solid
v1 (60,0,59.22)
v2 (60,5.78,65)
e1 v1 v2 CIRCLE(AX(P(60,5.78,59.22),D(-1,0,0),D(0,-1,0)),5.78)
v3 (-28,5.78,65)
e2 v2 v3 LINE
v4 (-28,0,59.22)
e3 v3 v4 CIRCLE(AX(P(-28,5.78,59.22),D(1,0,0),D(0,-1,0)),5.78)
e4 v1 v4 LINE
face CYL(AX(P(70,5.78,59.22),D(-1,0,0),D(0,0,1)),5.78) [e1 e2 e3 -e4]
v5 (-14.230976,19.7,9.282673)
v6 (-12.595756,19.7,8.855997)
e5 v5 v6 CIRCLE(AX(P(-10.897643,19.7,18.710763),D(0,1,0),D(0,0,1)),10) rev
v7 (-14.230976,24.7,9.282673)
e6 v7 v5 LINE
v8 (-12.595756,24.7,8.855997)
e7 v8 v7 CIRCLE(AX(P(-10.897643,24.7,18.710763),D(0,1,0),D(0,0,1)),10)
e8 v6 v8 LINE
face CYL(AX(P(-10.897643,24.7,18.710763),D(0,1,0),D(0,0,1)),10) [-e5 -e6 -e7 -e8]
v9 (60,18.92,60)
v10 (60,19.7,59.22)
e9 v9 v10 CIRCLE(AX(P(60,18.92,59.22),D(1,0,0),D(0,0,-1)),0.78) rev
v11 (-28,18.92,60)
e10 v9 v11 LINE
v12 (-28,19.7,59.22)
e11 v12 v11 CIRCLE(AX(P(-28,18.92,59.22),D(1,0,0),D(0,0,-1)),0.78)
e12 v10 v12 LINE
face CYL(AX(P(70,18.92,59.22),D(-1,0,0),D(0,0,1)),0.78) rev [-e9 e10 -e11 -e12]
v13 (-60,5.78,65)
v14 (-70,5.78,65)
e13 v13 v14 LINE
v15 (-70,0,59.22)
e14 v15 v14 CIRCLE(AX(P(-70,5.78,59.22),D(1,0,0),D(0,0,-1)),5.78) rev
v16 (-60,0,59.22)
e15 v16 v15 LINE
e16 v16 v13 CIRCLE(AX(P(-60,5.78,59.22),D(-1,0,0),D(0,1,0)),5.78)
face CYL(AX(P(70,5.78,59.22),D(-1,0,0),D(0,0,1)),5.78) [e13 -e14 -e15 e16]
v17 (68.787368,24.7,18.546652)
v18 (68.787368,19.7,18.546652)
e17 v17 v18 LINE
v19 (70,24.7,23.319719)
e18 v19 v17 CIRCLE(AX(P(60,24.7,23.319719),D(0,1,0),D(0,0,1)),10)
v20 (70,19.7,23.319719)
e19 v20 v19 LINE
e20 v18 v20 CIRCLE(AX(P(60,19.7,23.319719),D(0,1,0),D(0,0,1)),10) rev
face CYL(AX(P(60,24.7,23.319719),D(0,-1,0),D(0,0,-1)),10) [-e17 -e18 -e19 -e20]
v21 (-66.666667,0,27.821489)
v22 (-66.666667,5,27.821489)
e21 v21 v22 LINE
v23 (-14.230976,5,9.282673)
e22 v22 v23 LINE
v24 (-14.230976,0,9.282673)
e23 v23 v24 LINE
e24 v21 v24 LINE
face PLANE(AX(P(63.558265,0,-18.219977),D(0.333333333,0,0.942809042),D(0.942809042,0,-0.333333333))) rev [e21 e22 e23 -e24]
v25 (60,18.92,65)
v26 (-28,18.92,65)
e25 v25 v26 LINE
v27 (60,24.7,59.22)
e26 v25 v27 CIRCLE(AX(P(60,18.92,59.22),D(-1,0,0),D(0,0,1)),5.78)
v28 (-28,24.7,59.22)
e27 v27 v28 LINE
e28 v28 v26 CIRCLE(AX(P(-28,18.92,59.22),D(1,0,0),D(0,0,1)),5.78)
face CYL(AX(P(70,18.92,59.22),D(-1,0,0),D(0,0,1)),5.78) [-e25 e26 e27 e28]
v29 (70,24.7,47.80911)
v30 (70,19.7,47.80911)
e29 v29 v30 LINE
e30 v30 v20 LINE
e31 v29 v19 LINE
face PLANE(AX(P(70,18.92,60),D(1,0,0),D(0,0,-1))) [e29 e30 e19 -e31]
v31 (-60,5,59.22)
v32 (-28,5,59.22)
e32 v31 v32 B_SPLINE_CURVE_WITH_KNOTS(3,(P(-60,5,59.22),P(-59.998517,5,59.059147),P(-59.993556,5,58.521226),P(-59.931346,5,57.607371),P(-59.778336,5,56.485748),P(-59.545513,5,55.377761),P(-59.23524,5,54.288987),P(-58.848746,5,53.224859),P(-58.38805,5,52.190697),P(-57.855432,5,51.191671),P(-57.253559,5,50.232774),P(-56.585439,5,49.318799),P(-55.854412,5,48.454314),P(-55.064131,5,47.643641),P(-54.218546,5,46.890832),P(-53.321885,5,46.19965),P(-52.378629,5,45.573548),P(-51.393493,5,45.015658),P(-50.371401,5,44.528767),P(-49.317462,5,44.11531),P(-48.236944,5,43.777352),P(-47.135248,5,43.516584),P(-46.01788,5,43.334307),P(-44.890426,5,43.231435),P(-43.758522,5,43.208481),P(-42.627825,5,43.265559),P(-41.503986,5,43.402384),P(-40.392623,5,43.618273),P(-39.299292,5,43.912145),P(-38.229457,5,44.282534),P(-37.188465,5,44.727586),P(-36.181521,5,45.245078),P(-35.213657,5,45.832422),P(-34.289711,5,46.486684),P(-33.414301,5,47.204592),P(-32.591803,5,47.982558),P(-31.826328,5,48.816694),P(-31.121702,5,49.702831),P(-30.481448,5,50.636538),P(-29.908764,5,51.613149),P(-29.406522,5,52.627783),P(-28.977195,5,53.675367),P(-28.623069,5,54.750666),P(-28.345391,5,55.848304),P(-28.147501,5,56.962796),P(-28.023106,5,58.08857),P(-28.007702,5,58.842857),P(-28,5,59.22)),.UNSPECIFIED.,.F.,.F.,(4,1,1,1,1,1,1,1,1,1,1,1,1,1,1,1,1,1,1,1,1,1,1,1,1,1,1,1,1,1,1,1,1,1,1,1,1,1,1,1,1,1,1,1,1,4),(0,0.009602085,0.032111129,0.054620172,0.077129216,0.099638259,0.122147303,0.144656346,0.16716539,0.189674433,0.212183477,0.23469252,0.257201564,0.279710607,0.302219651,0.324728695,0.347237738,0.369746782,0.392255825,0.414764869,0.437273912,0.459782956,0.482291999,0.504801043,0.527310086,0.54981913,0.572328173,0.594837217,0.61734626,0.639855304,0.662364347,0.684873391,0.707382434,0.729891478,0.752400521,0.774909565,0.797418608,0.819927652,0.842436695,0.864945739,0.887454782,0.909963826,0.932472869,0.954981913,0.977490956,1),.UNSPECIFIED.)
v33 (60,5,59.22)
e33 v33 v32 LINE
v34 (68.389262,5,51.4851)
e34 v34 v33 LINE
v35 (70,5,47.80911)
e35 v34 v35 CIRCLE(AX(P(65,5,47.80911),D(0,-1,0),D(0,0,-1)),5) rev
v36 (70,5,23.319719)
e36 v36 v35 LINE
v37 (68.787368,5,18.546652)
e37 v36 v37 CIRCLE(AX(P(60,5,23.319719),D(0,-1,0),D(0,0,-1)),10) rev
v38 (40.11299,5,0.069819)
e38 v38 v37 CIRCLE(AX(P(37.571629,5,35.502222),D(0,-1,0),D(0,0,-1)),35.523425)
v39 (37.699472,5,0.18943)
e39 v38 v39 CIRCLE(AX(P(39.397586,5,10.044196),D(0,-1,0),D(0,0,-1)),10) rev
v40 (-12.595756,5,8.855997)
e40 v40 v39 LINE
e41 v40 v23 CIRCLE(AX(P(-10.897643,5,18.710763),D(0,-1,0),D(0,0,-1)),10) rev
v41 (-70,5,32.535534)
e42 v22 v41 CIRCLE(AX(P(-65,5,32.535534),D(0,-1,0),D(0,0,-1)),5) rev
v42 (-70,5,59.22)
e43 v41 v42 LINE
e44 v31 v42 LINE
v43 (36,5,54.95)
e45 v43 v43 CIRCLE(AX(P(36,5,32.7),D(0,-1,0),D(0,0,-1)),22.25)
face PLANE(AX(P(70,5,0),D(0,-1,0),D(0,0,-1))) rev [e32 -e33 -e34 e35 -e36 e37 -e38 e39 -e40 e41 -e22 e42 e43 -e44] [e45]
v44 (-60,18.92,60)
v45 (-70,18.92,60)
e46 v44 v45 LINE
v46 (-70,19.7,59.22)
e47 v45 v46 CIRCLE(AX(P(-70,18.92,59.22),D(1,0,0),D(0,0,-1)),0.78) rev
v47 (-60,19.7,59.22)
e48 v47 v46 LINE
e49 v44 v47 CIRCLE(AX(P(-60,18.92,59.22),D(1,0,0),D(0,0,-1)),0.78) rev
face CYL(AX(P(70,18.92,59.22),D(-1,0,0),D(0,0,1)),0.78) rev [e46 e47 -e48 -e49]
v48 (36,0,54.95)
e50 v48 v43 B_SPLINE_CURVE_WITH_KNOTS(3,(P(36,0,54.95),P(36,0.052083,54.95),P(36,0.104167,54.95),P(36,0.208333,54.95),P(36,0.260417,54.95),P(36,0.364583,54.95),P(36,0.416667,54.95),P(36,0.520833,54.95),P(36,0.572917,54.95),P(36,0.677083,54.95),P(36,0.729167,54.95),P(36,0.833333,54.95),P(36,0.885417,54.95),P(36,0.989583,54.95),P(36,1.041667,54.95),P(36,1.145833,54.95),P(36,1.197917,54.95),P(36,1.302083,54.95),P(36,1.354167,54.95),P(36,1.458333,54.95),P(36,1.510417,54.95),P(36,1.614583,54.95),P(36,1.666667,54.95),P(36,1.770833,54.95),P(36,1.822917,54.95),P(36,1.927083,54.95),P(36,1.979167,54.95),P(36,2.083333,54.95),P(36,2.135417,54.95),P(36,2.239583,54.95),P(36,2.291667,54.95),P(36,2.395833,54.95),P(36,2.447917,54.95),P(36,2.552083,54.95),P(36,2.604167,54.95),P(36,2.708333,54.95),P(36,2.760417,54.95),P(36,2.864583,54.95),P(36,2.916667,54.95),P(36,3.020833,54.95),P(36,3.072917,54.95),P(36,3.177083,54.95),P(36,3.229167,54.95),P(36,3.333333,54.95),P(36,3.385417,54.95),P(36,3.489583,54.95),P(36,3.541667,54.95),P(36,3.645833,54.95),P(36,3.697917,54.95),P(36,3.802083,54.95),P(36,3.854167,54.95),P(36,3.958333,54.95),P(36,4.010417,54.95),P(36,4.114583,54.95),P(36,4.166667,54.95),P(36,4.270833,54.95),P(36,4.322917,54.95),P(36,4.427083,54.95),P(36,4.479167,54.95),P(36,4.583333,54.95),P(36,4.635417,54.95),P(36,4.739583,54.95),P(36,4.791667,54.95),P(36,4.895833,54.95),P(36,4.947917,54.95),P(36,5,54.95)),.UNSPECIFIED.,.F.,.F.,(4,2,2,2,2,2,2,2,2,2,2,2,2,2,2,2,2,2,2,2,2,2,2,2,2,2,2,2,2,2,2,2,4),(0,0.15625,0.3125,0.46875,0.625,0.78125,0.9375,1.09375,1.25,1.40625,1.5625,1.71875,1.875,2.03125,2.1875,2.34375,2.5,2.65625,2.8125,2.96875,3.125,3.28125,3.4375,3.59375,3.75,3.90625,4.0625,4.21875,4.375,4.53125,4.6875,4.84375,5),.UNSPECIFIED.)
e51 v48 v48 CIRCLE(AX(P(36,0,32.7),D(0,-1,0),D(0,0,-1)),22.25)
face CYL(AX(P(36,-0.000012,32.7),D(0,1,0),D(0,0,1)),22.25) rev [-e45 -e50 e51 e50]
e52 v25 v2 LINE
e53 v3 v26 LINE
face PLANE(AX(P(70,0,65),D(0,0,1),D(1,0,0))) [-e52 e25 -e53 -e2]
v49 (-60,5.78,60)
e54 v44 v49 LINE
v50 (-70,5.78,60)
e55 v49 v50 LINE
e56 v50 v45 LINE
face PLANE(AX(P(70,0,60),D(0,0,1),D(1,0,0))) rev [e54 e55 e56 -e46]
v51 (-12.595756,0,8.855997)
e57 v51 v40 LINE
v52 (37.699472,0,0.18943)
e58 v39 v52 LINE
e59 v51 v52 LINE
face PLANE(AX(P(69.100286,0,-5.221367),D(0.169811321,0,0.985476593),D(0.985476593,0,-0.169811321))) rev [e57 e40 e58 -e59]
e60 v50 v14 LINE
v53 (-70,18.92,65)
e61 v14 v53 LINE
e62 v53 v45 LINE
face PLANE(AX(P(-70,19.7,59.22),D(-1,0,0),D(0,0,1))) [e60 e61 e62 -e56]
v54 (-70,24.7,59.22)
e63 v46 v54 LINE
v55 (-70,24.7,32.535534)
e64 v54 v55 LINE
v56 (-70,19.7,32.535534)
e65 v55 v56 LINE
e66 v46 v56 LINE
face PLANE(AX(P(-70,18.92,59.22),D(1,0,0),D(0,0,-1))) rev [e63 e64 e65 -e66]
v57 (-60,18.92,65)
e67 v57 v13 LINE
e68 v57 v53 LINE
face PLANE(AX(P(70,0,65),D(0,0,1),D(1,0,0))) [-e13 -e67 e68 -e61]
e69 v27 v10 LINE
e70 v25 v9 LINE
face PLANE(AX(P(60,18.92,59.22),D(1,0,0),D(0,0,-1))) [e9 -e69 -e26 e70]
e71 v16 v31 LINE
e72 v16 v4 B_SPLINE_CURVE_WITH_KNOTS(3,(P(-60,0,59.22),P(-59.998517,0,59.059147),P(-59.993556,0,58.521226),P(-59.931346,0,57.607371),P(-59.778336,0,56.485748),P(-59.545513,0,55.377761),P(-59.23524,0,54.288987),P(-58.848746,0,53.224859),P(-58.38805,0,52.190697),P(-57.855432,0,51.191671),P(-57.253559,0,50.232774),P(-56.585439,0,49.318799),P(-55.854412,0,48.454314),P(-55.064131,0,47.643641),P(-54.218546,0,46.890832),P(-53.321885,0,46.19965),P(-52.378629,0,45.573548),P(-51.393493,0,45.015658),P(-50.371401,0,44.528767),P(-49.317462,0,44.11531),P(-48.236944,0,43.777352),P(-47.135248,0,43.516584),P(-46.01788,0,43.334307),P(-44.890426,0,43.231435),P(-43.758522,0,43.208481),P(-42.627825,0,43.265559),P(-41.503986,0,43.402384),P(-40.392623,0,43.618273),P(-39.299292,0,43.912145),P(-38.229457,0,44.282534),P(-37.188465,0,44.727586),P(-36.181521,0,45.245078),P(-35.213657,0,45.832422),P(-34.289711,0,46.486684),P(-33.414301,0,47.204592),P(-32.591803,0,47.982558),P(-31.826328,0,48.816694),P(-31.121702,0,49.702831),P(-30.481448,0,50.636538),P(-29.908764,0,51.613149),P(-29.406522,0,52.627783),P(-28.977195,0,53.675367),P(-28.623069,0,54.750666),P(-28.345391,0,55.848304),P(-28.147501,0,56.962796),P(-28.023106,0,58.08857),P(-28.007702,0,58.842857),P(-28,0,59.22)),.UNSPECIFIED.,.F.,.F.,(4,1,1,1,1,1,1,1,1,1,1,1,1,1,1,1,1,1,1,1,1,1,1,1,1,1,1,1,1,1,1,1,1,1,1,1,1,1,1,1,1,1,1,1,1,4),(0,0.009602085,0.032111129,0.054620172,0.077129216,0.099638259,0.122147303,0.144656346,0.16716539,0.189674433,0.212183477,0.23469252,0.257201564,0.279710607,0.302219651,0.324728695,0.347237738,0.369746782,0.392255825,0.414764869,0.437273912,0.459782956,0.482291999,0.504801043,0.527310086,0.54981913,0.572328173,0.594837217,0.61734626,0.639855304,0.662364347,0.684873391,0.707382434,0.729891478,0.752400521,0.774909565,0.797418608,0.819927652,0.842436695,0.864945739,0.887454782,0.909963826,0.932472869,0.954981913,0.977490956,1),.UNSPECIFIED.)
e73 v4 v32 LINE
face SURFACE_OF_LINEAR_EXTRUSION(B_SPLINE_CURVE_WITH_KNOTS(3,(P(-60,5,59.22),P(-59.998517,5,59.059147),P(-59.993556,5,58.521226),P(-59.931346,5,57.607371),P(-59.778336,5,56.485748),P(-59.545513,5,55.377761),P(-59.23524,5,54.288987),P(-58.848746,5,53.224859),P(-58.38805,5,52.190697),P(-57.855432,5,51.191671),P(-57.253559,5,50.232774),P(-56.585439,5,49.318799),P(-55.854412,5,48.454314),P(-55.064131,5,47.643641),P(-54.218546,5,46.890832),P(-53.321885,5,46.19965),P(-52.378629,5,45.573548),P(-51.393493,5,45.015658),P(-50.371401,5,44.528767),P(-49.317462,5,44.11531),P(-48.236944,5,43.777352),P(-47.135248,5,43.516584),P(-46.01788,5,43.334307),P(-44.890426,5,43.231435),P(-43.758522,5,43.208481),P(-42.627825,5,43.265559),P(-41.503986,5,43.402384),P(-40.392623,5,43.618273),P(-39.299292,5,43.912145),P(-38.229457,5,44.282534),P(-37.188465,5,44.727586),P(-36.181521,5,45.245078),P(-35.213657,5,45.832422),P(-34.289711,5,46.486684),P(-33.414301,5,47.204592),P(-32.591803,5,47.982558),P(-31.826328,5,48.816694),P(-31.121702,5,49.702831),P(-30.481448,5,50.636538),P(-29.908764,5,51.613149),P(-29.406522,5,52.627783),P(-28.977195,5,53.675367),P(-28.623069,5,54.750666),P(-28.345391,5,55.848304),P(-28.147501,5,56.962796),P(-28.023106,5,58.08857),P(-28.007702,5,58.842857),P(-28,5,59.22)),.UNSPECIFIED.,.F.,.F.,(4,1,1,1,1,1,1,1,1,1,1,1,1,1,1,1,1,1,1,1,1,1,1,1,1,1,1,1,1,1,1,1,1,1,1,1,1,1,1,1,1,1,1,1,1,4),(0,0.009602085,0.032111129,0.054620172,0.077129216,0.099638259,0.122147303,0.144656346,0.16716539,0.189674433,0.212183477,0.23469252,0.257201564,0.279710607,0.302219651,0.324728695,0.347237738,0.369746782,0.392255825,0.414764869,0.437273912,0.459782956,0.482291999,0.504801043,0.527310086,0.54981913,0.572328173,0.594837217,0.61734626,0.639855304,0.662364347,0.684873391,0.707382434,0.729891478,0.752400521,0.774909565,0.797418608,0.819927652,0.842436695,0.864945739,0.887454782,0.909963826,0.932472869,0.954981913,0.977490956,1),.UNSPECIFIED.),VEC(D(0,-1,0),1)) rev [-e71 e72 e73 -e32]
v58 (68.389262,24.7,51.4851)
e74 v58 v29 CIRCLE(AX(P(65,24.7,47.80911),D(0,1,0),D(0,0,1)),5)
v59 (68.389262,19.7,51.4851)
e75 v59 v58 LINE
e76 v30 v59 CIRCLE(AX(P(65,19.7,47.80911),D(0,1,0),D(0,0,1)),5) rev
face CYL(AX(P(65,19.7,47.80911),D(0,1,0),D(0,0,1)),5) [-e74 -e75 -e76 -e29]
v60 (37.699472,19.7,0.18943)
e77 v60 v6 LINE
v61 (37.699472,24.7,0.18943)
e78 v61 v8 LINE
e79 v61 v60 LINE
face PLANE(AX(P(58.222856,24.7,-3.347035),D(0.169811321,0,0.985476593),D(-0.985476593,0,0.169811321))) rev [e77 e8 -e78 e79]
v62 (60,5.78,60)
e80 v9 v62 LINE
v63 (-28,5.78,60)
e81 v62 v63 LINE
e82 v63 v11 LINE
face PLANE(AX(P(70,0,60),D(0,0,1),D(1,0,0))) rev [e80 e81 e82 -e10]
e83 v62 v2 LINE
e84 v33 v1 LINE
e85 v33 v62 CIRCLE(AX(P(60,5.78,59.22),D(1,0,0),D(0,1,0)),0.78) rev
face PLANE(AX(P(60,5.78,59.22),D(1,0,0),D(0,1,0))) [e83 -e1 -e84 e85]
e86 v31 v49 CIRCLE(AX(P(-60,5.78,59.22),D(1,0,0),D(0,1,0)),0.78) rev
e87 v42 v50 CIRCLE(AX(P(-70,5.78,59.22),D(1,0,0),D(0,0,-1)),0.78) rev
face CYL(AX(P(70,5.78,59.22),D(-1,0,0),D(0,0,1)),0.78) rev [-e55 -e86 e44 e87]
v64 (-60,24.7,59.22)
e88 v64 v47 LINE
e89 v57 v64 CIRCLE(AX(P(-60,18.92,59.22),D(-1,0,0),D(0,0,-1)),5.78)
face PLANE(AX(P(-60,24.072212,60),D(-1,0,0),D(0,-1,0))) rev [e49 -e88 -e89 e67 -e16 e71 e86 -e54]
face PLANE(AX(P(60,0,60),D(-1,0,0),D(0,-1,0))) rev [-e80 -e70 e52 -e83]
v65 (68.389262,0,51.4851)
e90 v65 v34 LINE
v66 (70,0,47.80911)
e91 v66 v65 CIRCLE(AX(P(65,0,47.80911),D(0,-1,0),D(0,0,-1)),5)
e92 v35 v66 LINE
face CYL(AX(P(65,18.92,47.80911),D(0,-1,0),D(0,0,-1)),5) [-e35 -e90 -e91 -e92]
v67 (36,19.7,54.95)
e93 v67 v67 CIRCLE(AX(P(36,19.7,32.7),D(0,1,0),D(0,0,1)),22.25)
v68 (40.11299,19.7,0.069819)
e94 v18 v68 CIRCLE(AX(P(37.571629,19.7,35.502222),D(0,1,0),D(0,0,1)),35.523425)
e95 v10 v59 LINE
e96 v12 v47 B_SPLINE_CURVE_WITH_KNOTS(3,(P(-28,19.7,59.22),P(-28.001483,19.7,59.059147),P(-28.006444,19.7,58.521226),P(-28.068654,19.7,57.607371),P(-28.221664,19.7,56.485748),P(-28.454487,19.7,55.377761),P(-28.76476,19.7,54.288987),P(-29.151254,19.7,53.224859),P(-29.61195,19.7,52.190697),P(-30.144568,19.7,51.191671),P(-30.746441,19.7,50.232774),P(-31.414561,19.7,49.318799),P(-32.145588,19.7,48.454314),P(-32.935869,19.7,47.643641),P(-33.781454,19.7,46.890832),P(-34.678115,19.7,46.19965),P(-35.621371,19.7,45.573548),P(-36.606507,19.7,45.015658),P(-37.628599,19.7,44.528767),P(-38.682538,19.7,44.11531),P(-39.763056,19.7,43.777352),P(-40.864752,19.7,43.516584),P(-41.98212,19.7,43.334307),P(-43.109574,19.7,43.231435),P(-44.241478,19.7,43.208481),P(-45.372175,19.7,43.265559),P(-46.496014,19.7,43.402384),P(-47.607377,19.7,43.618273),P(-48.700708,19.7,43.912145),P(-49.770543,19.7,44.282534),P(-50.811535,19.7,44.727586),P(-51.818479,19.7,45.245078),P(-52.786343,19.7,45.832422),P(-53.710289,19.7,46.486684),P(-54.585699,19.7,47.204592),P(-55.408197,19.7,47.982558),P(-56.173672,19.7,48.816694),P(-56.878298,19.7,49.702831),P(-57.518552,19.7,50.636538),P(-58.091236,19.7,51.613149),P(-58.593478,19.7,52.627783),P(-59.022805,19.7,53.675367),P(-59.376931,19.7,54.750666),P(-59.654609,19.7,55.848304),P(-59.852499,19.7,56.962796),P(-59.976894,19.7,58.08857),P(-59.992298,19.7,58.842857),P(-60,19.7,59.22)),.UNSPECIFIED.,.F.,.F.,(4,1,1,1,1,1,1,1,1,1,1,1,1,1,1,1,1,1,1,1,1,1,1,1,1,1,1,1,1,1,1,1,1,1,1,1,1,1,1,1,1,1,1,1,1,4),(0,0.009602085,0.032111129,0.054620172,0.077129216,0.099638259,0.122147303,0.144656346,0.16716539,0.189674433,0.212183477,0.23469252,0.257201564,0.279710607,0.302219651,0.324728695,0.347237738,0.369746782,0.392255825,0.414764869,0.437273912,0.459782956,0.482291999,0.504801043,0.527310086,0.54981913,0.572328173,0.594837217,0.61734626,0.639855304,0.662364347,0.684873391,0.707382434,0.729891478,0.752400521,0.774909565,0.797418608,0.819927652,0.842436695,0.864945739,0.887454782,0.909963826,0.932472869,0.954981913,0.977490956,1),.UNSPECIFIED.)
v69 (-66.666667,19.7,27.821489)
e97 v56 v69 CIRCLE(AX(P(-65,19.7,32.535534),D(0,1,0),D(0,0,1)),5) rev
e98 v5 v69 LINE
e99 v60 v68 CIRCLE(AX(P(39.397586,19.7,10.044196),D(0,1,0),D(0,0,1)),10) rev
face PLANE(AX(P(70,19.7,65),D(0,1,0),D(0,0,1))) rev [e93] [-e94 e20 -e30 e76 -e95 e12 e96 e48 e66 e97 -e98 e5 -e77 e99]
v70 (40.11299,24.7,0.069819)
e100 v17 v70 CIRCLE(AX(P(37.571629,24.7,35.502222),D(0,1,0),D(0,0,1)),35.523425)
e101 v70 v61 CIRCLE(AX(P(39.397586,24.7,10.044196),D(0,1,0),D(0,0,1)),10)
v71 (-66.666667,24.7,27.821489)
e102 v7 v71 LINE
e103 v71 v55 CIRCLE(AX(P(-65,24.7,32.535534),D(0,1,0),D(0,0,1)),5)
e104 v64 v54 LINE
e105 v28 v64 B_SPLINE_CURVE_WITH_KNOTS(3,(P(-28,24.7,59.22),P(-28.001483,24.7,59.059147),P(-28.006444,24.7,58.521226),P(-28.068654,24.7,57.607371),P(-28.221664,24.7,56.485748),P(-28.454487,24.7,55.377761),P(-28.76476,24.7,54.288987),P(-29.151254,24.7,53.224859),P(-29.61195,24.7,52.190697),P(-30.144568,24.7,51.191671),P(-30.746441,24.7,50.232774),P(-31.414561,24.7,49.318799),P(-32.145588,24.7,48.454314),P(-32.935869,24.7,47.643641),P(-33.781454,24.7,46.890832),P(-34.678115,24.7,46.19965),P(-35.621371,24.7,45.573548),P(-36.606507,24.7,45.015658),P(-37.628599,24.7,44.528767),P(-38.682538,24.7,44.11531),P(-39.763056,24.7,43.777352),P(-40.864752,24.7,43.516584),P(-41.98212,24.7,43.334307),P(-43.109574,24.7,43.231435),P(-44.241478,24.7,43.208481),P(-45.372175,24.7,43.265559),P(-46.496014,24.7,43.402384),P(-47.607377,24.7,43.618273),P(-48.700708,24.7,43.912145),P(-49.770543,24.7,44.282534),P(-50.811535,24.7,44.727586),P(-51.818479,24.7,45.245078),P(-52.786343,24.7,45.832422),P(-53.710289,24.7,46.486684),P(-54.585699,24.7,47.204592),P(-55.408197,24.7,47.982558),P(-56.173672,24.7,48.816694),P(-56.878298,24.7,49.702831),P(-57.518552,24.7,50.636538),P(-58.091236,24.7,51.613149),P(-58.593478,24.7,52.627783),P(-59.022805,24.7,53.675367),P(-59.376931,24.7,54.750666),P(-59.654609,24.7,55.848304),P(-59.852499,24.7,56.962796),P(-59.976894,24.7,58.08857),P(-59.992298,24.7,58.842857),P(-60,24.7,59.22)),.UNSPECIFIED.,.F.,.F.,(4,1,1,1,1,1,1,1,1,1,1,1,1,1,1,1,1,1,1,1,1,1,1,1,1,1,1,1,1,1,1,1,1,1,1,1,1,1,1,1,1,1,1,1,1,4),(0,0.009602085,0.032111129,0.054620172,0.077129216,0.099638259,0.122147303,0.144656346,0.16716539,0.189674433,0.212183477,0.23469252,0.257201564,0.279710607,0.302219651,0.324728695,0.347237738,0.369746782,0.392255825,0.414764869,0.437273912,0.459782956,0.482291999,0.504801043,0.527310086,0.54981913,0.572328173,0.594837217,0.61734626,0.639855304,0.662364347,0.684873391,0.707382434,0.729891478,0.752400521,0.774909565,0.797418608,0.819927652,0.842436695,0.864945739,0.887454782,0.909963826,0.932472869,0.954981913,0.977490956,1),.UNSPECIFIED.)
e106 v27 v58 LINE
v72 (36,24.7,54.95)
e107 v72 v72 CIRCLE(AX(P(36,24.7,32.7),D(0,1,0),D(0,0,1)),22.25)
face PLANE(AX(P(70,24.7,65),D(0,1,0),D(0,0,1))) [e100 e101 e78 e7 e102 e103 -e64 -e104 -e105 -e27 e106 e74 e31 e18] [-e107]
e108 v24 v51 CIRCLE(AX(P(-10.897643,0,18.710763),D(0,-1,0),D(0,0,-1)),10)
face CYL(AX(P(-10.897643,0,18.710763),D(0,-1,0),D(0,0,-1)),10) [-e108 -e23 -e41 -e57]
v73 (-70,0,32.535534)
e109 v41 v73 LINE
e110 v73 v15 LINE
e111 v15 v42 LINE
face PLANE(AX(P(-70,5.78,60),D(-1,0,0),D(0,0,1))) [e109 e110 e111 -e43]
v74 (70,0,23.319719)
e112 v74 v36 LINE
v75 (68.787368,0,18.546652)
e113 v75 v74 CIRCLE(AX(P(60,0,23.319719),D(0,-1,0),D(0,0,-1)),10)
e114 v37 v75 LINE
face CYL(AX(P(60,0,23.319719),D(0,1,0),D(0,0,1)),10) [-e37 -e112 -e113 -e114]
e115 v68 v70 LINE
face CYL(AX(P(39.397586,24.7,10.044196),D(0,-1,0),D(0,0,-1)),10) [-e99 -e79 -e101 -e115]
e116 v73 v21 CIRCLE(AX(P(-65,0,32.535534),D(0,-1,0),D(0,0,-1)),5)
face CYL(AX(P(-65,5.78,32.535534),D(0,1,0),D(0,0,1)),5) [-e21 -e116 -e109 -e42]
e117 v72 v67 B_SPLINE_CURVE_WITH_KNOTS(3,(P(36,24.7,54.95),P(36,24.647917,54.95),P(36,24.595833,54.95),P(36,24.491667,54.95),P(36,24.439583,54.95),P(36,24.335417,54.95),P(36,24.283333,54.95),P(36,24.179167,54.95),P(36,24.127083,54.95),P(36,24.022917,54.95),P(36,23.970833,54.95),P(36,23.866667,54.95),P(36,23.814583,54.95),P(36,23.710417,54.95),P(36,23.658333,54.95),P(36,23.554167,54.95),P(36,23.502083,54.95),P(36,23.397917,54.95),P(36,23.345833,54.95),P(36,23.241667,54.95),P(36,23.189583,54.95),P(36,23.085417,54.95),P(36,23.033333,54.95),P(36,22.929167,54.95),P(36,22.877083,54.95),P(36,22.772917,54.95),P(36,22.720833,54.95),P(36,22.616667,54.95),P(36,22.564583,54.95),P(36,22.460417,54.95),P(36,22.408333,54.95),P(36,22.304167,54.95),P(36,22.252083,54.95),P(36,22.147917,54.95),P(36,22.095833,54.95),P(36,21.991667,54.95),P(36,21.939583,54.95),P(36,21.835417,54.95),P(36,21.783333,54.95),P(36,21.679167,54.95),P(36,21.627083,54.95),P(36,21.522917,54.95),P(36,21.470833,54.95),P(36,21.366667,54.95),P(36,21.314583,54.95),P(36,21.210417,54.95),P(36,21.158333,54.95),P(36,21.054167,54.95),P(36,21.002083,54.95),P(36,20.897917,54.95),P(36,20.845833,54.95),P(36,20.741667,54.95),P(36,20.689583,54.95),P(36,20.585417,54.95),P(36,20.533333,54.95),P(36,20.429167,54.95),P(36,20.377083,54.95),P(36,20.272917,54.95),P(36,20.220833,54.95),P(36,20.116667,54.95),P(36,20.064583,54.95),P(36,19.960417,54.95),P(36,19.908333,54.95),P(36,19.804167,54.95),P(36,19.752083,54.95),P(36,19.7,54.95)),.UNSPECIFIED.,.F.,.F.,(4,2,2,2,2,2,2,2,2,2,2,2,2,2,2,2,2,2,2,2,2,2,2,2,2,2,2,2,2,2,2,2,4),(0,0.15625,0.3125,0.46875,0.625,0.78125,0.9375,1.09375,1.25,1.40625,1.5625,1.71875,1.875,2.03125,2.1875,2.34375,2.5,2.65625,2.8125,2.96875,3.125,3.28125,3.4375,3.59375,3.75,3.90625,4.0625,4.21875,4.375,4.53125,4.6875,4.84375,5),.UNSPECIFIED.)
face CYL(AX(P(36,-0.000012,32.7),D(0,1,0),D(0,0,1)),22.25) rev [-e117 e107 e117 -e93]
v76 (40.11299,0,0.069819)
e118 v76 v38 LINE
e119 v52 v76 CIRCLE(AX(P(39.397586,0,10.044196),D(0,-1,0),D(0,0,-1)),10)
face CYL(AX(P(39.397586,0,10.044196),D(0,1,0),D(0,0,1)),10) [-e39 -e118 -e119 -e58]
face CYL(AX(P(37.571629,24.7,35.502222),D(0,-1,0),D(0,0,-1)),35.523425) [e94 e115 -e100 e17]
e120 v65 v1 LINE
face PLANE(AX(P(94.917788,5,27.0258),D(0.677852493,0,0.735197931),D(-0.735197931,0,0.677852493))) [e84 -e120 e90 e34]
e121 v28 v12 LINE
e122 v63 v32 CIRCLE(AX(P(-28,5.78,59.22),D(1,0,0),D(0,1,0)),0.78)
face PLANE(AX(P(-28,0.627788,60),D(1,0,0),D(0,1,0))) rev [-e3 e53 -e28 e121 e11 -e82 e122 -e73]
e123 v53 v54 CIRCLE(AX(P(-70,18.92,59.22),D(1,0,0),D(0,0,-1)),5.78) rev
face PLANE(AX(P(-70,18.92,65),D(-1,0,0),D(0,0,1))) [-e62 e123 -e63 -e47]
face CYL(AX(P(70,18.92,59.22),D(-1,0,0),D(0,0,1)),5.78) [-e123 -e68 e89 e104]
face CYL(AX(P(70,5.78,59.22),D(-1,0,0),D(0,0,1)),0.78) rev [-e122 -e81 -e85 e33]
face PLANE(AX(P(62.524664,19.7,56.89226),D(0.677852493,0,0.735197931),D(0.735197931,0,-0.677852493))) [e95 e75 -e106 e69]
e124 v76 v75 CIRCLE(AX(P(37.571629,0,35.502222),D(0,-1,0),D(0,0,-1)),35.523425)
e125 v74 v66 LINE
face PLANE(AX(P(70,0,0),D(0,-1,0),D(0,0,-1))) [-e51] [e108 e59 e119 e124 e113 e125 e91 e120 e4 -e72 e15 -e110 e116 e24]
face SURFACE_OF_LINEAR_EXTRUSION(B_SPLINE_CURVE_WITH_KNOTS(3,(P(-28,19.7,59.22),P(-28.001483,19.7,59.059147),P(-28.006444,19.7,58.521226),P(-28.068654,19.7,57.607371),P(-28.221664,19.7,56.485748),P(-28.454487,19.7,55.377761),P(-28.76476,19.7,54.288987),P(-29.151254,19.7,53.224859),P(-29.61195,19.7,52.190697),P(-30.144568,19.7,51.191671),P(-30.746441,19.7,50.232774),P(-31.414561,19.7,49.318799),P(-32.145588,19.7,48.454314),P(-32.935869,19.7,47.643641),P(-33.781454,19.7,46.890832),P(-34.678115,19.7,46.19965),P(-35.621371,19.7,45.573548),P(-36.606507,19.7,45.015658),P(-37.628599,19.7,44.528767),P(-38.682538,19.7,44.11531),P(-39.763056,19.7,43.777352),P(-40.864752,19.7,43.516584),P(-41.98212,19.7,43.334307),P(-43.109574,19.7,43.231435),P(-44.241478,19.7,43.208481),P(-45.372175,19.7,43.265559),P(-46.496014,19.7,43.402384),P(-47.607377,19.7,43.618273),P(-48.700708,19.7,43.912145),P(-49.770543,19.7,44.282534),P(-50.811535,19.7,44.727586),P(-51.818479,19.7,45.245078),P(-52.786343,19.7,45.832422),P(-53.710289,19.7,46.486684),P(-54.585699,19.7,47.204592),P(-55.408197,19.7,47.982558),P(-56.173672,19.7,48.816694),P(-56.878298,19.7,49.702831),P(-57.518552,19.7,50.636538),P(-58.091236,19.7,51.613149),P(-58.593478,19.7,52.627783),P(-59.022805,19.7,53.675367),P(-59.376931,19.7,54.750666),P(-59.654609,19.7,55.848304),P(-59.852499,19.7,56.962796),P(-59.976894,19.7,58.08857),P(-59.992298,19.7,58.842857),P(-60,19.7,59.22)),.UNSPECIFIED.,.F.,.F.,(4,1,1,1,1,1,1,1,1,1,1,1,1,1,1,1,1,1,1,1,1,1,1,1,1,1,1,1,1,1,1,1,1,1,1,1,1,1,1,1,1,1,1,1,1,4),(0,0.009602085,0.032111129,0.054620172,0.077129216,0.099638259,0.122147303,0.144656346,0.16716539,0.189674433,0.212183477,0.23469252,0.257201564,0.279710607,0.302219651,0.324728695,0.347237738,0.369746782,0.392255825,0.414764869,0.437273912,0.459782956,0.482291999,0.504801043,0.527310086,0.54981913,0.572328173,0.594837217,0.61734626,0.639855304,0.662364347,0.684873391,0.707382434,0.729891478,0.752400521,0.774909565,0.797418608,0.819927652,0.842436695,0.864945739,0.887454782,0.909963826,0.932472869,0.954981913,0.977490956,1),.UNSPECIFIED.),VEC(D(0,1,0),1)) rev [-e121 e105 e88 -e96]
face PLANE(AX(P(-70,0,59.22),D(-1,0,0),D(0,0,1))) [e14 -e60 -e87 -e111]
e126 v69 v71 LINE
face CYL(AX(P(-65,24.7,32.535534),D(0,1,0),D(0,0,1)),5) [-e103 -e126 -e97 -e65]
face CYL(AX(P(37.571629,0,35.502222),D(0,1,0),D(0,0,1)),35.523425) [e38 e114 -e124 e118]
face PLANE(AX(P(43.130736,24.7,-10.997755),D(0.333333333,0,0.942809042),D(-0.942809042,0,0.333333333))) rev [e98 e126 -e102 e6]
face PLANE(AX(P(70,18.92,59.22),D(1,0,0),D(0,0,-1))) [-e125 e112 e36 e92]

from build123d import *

# Parameters (mm, degrees)
BASE_FLANGE1_DEPTH      = 70
CUT_EXTRUDE2_DEPTH      = 99.666559685
CUT_EXTRUDE2_DEPTH_BACK = 99.666559685
SKETCH6_R               = 22.25
CUT_EXTRUDE3_START      = -24.7
CUT_EXTRUDE3_DEPTH      = 24.7
FILLET1_R               = 10
FILLET2_R               = 5


# Read off the part's stored shape, not the designer's step: Cut-Extrude3
# Sheet-metal steps are written as plain solids
with BuildPart() as part:
    # Sketch1 → Base-Flange1 (new, symmetric)
    with BuildSketch(Plane(origin=(0, 0, 0), x_dir=(0, 0, -1), z_dir=(1, 0, 0))):
        with BuildLine():
            Line((0, 0), (-59.22, 0))
            ThreePointArc((-59.22, 0), (-63.307077195, 1.692922805), (-65, 5.78))
            Line((-65, 5.78), (-65, 18.92))
            ThreePointArc((-65, 18.92), (-63.307077195, 23.007077195), (-59.22, 24.7))
            Line((-59.22, 24.7), (0, 24.7))
            Line((0, 24.7), (0, 19.7))
            Line((0, 19.7), (-59.22, 19.7))
            ThreePointArc((-59.22, 19.7), (-59.771543289, 19.471543289), (-60, 18.92))
            Line((-60, 18.92), (-60, 5.78))
            ThreePointArc((-60, 5.78), (-59.771543289, 5.228456711), (-59.22, 5))
            Line((-59.22, 5), (0, 5))
            Line((0, 5), (0, 0))
        make_face()
    extrude(amount=BASE_FLANGE1_DEPTH, both=True)

    # Sketch6 → Cut-Extrude2 (cut, two sides: drawn at the far end of the back side and taken through both)
    with BuildSketch(Plane(origin=(0, 0, 0), x_dir=(1, 0, 0), z_dir=(0, 1, 0)).offset(-CUT_EXTRUDE2_DEPTH_BACK)):
        with Locations(Location((36, -32.7, 0), (0, 0, 270))):
            Circle(SKETCH6_R)
    extrude(amount=CUT_EXTRUDE2_DEPTH + CUT_EXTRUDE2_DEPTH_BACK, mode=Mode.SUBTRACT)

    # Cut-Extrude3 outline → Cut-Extrude3 (cut)
    with BuildSketch(Plane(origin=(0, 24.7, 0), x_dir=(1, 0, 0), z_dir=(0, 1, 0)).offset(CUT_EXTRUDE3_START)):
        with BuildLine():
            add(Edge.make_bspline(
                [(-28, -59.22), (-28.001483373, -59.059147185), (-28.006444043, -58.521225961), (-28.068654058, -57.607370733), (-28.221663959, -56.485748427), (-28.454487396, -55.377760999), (-28.76476049, -54.288987367), (-29.151253932, -53.224858787), (-29.611949694, -52.190697164), (-30.144568106, -51.191670906), (-30.746440721, -50.232773794), (-31.414560774, -49.318798758), (-32.145588265, -48.454314261), (-32.935869316, -47.643641371), (-33.781453727, -46.890832185), (-34.678114904, -46.199649575), (-35.621370941, -45.573548372), (-36.606507032, -45.015658105), (-37.628599035, -44.528767354), (-38.682538088, -44.11530981), (-39.763056142, -43.777352116), (-40.864752295, -43.516583532), (-41.982119787, -43.334307495), (-43.109573528, -43.231435098), (-44.24147801, -43.208480544), (-45.372175479, -43.265558569), (-46.496014214, -43.402383872), (-47.607376779, -43.618272541), (-48.700708096, -43.91214547), (-49.770543218, -44.282533752), (-50.81153464, -44.727586026), (-51.818479031, -45.245077726), (-52.786343244, -45.832422201), (-53.71028947, -46.486683647), (-54.585699418, -47.204591779), (-55.408197421, -47.982558178), (-56.17367222, -48.816694228), (-56.878297832, -49.702830551), (-57.518551508, -50.636537851), (-58.091235675, -51.613149051), (-58.593477749, -52.627782619), (-59.022804836, -53.675366973), (-59.376930909, -54.75066583), (-59.654608607, -55.848304374), (-59.852499172, -56.962796127), (-59.976893957, -58.088570374), (-59.992297986, -58.842856791), (-60, -59.22)],
                knots=[0, 0, 0, 0, 0.009602085, 0.032111129, 0.054620172, 0.077129216, 0.099638259, 0.122147303, 0.144656346, 0.16716539, 0.189674433, 0.212183477, 0.23469252, 0.257201564, 0.279710607, 0.302219651, 0.324728695, 0.347237738, 0.369746782, 0.392255825, 0.414764869, 0.437273912, 0.459782956, 0.482291999, 0.504801043, 0.527310086, 0.54981913, 0.572328173, 0.594837217, 0.61734626, 0.639855304, 0.662364347, 0.684873391, 0.707382434, 0.729891478, 0.752400521, 0.774909565, 0.797418608, 0.819927652, 0.842436695, 0.864945739, 0.887454782, 0.909963826, 0.932472869, 0.954981913, 0.977490956, 1, 1, 1, 1], degree=3))
            Line((-60, -59.22), (-60, -65))
            Line((-60, -65), (-28, -65))
            Line((-28, -65), (-28, -59.22))
        make_face()
        Polygon((-13.431457505, -9), (38.798801924, 0), (-70, 0), (-70, -29), align=None)
        with BuildLine():
            ThreePointArc((38.798801924, 0), (57.406545367, -6.032071037), (70, -21))
            Line((70, -21), (70, 0))
            Line((70, 0), (38.798801924, 0))
        make_face()
        Polygon((70, -65), (70, -50), (60, -59.22), (60, -65), align=None)
    extrude(amount=CUT_EXTRUDE3_DEPTH, mode=Mode.SUBTRACT)

    # Fillet1
    fillet1_edges = [part.edges().sort_by_distance(p)[0] for p in [
        (38.798801924, 22.2, 0),
        (-13.431457505, 22.2, 9),
        (70, 2.5, 21),
        (38.798801924, 2.5, 0),
        (-13.431457505, 2.5, 9),
        (70, 22.2, 21),
    ]]
    fillet(fillet1_edges, radius=FILLET1_R)

    # Fillet2
    fillet2_edges = [part.edges().sort_by_distance(p)[0] for p in [
        (-70, 22.2, 29),
        (70, 2.5, 50),
        (70, 22.2, 50),
        (-70, 2.5, 29),
    ]]
    fillet(fillet2_edges, radius=FILLET2_R)


solid = part.part
